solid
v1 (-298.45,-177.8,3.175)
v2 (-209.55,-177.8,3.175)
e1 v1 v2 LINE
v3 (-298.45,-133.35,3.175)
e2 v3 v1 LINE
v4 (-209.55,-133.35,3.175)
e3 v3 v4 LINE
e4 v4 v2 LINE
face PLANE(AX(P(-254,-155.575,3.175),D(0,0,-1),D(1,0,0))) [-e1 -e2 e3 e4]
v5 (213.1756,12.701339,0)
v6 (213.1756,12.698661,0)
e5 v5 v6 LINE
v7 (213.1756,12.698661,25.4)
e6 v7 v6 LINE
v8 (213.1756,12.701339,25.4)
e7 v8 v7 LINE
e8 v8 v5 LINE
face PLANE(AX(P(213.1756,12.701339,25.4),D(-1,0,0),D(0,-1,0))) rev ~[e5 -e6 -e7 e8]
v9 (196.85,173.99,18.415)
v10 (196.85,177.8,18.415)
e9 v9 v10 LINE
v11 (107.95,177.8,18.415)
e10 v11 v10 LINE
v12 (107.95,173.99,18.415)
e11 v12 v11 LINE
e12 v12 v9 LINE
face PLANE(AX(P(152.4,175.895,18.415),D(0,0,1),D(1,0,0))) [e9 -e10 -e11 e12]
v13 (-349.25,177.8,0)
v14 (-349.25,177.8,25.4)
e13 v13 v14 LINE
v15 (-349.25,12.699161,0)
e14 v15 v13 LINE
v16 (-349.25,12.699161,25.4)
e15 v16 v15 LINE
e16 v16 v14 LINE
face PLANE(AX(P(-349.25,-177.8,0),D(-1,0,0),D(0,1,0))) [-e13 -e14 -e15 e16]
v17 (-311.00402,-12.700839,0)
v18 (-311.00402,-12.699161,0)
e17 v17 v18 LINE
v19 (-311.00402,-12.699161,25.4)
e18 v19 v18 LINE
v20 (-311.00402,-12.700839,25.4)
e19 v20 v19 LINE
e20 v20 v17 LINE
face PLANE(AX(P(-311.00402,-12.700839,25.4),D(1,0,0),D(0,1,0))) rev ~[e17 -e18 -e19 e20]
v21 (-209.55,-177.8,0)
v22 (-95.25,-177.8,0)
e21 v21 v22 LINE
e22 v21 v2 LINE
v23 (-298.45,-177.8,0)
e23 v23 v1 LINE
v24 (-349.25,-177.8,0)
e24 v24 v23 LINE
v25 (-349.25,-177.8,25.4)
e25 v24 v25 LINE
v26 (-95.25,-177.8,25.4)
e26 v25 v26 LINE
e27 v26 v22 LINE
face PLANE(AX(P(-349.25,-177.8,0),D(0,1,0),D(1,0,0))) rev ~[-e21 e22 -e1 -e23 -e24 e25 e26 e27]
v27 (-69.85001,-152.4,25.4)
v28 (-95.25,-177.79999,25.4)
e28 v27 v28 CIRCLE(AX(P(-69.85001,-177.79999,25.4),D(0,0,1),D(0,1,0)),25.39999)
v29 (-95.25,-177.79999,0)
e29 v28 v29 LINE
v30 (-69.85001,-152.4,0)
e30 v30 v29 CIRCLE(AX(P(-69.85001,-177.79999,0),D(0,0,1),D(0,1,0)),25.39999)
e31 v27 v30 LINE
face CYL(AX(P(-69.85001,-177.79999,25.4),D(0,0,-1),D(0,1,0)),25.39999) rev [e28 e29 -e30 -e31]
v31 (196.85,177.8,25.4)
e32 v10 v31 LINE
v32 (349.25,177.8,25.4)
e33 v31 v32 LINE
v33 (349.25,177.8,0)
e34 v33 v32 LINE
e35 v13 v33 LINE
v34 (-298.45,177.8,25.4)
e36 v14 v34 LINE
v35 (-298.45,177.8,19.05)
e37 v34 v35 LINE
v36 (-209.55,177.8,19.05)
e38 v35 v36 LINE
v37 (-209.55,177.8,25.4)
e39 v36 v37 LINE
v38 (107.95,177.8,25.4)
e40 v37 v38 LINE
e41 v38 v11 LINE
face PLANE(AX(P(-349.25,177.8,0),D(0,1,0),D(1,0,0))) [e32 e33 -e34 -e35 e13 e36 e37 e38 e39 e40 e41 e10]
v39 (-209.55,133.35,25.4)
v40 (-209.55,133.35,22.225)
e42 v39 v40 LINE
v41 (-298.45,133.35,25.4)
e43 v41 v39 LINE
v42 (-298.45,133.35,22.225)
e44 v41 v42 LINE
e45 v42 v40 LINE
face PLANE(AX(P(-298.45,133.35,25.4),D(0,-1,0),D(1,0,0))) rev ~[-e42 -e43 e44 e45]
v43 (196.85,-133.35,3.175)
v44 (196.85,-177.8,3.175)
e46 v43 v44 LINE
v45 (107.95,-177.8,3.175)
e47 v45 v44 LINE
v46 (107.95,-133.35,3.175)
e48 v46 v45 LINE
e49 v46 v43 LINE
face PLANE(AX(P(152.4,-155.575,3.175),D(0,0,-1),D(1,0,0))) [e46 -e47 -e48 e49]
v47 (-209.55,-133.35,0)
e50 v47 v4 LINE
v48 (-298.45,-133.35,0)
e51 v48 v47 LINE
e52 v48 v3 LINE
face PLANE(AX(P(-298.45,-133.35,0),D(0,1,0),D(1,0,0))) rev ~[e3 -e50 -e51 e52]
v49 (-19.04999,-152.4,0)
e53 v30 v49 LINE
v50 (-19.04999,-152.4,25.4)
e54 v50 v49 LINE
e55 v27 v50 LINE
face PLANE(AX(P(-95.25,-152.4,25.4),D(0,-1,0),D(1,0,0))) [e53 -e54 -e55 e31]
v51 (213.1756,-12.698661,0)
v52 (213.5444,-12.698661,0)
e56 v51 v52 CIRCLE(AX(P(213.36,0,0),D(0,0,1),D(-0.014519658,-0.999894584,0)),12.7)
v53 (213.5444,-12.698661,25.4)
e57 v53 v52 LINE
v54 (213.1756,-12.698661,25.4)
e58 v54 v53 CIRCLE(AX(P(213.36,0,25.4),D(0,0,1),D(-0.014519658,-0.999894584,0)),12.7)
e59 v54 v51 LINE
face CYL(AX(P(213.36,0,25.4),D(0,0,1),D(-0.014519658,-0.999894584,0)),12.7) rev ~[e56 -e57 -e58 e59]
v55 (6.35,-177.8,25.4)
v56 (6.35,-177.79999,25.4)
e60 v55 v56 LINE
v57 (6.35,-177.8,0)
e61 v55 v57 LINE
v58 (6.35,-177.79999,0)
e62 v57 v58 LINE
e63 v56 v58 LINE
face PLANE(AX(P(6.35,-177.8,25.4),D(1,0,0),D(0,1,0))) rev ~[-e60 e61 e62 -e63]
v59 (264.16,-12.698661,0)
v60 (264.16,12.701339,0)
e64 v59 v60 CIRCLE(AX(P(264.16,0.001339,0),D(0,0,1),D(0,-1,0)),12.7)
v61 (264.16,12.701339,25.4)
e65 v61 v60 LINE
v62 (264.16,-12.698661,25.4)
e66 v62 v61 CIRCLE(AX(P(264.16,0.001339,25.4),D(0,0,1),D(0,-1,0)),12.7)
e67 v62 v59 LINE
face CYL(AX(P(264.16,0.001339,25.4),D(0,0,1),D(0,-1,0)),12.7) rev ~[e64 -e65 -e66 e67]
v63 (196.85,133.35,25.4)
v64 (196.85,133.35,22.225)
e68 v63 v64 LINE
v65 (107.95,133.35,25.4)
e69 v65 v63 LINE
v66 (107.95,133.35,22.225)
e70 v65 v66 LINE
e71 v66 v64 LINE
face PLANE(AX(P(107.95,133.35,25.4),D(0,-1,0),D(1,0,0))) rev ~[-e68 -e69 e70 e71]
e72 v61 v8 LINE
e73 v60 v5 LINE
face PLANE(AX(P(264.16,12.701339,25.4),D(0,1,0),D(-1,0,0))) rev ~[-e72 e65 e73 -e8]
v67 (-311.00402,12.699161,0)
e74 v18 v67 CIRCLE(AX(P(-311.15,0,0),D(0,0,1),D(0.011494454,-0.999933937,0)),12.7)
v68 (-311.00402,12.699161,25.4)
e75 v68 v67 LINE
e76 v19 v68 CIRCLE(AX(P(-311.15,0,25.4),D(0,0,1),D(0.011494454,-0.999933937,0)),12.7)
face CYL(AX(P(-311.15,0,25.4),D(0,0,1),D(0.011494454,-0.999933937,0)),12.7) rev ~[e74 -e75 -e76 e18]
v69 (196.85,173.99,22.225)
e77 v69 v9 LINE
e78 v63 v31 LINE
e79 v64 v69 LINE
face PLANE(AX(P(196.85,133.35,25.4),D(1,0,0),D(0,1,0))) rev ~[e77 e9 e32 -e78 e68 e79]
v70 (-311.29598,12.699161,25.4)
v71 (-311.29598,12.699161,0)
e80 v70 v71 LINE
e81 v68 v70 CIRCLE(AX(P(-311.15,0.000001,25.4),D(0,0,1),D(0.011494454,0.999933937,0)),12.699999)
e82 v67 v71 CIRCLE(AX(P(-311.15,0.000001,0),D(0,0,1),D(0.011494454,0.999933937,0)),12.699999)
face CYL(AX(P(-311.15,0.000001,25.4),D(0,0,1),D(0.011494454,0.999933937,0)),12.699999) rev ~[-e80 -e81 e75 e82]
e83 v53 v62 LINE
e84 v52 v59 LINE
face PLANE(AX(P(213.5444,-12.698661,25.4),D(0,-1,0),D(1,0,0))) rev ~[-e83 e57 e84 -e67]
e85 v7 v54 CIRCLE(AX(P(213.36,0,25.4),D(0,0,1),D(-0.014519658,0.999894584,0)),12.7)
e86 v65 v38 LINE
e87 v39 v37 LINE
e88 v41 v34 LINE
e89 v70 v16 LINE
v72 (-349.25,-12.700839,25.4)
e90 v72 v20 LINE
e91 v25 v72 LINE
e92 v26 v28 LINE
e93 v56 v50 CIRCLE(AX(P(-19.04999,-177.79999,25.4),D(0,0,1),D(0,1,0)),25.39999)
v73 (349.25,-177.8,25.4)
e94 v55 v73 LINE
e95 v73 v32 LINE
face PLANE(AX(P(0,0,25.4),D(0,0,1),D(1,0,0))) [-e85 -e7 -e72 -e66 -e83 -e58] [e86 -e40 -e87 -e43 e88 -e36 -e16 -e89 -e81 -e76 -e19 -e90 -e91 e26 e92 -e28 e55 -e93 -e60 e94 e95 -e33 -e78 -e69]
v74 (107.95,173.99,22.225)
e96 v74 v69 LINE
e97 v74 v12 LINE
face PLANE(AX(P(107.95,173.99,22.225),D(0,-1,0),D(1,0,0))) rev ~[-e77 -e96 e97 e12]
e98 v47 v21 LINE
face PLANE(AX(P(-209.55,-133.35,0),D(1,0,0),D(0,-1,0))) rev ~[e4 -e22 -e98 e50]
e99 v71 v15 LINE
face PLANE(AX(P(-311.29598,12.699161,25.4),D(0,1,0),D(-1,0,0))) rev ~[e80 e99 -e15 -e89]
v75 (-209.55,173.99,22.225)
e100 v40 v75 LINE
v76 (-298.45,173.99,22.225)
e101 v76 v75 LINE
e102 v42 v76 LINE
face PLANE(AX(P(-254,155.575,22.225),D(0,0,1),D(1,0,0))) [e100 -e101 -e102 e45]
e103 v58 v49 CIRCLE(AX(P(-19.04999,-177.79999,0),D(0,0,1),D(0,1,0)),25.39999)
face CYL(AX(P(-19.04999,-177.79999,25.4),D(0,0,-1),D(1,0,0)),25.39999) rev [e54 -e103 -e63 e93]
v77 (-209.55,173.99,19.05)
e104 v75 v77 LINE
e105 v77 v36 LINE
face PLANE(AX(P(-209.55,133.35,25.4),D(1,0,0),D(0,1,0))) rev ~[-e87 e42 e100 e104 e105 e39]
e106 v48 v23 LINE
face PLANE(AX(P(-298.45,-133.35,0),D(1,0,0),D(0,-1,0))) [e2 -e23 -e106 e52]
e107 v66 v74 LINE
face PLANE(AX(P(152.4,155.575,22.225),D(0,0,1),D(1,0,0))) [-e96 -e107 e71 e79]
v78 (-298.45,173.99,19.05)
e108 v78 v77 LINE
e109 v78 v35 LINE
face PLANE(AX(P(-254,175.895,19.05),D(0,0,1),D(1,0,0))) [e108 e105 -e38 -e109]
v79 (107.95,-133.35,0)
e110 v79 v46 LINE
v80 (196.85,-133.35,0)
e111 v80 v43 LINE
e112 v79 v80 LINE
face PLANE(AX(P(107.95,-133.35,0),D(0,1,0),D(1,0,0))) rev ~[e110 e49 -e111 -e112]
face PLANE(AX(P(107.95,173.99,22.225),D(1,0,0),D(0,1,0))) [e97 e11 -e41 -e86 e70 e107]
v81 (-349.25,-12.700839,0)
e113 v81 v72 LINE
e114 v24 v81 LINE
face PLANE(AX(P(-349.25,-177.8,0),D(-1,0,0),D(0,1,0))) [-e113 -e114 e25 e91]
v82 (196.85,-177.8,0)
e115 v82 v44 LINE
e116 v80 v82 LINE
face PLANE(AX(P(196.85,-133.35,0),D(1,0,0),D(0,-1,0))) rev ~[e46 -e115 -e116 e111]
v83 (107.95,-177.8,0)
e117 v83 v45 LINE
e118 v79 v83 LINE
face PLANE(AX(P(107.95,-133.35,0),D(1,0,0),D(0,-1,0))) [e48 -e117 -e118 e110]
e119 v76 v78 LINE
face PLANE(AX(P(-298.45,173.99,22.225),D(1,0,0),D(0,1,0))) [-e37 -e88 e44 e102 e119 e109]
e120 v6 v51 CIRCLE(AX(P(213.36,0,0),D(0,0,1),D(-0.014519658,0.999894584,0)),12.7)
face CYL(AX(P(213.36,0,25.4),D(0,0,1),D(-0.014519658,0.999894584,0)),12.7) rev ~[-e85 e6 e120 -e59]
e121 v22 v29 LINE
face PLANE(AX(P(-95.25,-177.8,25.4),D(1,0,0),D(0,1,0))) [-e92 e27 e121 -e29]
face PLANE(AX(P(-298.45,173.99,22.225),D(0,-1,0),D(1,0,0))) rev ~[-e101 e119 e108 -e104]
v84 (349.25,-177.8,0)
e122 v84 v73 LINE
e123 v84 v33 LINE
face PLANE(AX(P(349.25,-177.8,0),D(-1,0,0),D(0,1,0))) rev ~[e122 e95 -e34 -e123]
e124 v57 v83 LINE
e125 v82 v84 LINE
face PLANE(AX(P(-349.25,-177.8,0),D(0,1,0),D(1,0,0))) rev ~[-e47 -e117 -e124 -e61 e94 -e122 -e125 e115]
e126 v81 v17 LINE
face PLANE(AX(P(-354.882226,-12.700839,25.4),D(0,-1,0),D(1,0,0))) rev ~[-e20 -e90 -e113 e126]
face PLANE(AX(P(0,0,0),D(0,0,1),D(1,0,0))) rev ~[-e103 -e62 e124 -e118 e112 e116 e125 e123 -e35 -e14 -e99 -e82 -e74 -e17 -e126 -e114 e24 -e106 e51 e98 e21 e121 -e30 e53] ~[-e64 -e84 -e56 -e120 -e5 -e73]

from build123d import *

# Parameters (mm, degrees)
F0_W      = 698.5
F0_H      = 355.6
F1_DEPTH  = 25.4
F2_W      = 88.9
F2_H      = 44.45
F3_DEPTH  = 3.175
F4_W      = 88.9
F4_H      = 44.45
F5_DEPTH  = 3.175
F6_W      = 88.9
F6_H      = 3.81
F7_DEPTH  = 3.175
F8_W      = 88.9
F8_H      = 3.81
F9_DEPTH  = 3.81
F11_DEPTH = 25.4
F12_W     = 101.6
F12_H     = 25.4
F13_DEPTH = 25.4
F14_R     = 25.39999


# Not quite as in the source:
# - a fillet or chamfer is up to 0.001 mm smaller than in the source, because OpenCascade refuses the exact size


with BuildPart() as f1:
    # F0 (on Top) → F1 (new body)
    with BuildSketch(Plane.XY):
        Rectangle(F0_W, F0_H)
    extrude(amount=F1_DEPTH)

    # F2 (on face) → F3 (cut)
    with BuildSketch(Plane.XY.offset(25.4)):
        with Locations((-254, 155.575)):
            Rectangle(F2_W, F2_H)
        with Locations((152.4, 155.575)):
            Rectangle(F2_W, F2_H)
    extrude(amount=-F3_DEPTH, mode=Mode.SUBTRACT)

    # F4 (on face) → F5 (cut)
    with BuildSketch(Plane(origin=(0, 0, 0), x_dir=(1, 0, 0), z_dir=(0, 0, -1))):
        with Locations((-254, 155.575)):
            Rectangle(F4_W, F4_H)
        with Locations((152.4, 155.575)):
            Rectangle(F4_W, F4_H)
    extrude(amount=-F5_DEPTH, mode=Mode.SUBTRACT)

    # F6 (on face) → F7 (cut)
    with BuildSketch(Plane.XY.offset(22.225)):
        with Locations((-254, 175.895)):
            Rectangle(F6_W, F6_H)
    extrude(amount=-F7_DEPTH, mode=Mode.SUBTRACT)

    # F8 (on face) → F9 (cut)
    with BuildSketch(Plane.XY.offset(22.225)):
        with Locations((152.4, 175.895)):
            Rectangle(F8_W, F8_H)
    extrude(amount=-F9_DEPTH, mode=Mode.SUBTRACT)

    # F10 (on face) → F11 (cut)
    with BuildSketch(Plane.XY.offset(25.4)):
        with BuildLine():
            Line((-311.0040204385, -12.7008390054), (-311.0040204385, -12.6991609946))
            ThreePointArc((-311.0040204385, -12.6991609946), (-298.45, 0), (-311.0040204385, 12.6991609946))
            Line((-311.0040204385, 12.6991609946), (-311.2959795615, 12.6991609946))
            Line((-311.2959795615, 12.6991609946), (-354.8822260717, 12.6991609946))
            Line((-354.8822260717, 12.6991609946), (-354.8822260717, -12.7008390054))
            Line((-354.8822260717, -12.7008390054), (-311.0040204385, -12.7008390054))
        make_face()
        with BuildLine():
            Line((-311.2959795615, 12.6991609946), (-311.0040204385, 12.6991609946))
            ThreePointArc((-311.0040204385, 12.6991609946), (-311.15, 12.7), (-311.2959795615, 12.6991609946))
        make_face()
        with BuildLine():
            Line((213.1756003467, 12.7013387805), (213.1756003467, 12.6986612195))
            ThreePointArc((213.1756003467, 12.6986612195), (200.66, 0), (213.1756003467, -12.6986612195))
            Line((213.1756003467, -12.6986612195), (213.5443996533, -12.6986612195))
            Line((213.5443996533, -12.6986612195), (264.16, -12.6986612195))
            ThreePointArc((264.16, -12.6986612195), (276.86, 0.0013387805), (264.16, 12.7013387805))
            Line((264.16, 12.7013387805), (213.1756003467, 12.7013387805))
        make_face()
        with BuildLine():
            Line((213.5443996533, -12.6986612195), (213.1756003467, -12.6986612195))
            ThreePointArc((213.1756003467, -12.6986612195), (213.36, -12.7), (213.5443996533, -12.6986612195))
        make_face()
    extrude(amount=-F11_DEPTH, mode=Mode.SUBTRACT)

    # F12 (on face) → F13 (cut)
    with BuildSketch(Plane.XY.offset(25.4)):
        with Locations((-44.45, -165.1)):
            Rectangle(F12_W, F12_H)
    extrude(amount=-F13_DEPTH, mode=Mode.SUBTRACT)

    # F14 (radius 25.4 in the source; OpenCascade refuses exactly that, so slightly less here)
    f14_edges = [f1.edges().sort_by_distance(p)[0] for p in [
        (-95.25, -152.4, 12.7),
        (6.35, -152.4, 12.7),
    ]]
    fillet(f14_edges, radius=F14_R)


solid = f1.part
